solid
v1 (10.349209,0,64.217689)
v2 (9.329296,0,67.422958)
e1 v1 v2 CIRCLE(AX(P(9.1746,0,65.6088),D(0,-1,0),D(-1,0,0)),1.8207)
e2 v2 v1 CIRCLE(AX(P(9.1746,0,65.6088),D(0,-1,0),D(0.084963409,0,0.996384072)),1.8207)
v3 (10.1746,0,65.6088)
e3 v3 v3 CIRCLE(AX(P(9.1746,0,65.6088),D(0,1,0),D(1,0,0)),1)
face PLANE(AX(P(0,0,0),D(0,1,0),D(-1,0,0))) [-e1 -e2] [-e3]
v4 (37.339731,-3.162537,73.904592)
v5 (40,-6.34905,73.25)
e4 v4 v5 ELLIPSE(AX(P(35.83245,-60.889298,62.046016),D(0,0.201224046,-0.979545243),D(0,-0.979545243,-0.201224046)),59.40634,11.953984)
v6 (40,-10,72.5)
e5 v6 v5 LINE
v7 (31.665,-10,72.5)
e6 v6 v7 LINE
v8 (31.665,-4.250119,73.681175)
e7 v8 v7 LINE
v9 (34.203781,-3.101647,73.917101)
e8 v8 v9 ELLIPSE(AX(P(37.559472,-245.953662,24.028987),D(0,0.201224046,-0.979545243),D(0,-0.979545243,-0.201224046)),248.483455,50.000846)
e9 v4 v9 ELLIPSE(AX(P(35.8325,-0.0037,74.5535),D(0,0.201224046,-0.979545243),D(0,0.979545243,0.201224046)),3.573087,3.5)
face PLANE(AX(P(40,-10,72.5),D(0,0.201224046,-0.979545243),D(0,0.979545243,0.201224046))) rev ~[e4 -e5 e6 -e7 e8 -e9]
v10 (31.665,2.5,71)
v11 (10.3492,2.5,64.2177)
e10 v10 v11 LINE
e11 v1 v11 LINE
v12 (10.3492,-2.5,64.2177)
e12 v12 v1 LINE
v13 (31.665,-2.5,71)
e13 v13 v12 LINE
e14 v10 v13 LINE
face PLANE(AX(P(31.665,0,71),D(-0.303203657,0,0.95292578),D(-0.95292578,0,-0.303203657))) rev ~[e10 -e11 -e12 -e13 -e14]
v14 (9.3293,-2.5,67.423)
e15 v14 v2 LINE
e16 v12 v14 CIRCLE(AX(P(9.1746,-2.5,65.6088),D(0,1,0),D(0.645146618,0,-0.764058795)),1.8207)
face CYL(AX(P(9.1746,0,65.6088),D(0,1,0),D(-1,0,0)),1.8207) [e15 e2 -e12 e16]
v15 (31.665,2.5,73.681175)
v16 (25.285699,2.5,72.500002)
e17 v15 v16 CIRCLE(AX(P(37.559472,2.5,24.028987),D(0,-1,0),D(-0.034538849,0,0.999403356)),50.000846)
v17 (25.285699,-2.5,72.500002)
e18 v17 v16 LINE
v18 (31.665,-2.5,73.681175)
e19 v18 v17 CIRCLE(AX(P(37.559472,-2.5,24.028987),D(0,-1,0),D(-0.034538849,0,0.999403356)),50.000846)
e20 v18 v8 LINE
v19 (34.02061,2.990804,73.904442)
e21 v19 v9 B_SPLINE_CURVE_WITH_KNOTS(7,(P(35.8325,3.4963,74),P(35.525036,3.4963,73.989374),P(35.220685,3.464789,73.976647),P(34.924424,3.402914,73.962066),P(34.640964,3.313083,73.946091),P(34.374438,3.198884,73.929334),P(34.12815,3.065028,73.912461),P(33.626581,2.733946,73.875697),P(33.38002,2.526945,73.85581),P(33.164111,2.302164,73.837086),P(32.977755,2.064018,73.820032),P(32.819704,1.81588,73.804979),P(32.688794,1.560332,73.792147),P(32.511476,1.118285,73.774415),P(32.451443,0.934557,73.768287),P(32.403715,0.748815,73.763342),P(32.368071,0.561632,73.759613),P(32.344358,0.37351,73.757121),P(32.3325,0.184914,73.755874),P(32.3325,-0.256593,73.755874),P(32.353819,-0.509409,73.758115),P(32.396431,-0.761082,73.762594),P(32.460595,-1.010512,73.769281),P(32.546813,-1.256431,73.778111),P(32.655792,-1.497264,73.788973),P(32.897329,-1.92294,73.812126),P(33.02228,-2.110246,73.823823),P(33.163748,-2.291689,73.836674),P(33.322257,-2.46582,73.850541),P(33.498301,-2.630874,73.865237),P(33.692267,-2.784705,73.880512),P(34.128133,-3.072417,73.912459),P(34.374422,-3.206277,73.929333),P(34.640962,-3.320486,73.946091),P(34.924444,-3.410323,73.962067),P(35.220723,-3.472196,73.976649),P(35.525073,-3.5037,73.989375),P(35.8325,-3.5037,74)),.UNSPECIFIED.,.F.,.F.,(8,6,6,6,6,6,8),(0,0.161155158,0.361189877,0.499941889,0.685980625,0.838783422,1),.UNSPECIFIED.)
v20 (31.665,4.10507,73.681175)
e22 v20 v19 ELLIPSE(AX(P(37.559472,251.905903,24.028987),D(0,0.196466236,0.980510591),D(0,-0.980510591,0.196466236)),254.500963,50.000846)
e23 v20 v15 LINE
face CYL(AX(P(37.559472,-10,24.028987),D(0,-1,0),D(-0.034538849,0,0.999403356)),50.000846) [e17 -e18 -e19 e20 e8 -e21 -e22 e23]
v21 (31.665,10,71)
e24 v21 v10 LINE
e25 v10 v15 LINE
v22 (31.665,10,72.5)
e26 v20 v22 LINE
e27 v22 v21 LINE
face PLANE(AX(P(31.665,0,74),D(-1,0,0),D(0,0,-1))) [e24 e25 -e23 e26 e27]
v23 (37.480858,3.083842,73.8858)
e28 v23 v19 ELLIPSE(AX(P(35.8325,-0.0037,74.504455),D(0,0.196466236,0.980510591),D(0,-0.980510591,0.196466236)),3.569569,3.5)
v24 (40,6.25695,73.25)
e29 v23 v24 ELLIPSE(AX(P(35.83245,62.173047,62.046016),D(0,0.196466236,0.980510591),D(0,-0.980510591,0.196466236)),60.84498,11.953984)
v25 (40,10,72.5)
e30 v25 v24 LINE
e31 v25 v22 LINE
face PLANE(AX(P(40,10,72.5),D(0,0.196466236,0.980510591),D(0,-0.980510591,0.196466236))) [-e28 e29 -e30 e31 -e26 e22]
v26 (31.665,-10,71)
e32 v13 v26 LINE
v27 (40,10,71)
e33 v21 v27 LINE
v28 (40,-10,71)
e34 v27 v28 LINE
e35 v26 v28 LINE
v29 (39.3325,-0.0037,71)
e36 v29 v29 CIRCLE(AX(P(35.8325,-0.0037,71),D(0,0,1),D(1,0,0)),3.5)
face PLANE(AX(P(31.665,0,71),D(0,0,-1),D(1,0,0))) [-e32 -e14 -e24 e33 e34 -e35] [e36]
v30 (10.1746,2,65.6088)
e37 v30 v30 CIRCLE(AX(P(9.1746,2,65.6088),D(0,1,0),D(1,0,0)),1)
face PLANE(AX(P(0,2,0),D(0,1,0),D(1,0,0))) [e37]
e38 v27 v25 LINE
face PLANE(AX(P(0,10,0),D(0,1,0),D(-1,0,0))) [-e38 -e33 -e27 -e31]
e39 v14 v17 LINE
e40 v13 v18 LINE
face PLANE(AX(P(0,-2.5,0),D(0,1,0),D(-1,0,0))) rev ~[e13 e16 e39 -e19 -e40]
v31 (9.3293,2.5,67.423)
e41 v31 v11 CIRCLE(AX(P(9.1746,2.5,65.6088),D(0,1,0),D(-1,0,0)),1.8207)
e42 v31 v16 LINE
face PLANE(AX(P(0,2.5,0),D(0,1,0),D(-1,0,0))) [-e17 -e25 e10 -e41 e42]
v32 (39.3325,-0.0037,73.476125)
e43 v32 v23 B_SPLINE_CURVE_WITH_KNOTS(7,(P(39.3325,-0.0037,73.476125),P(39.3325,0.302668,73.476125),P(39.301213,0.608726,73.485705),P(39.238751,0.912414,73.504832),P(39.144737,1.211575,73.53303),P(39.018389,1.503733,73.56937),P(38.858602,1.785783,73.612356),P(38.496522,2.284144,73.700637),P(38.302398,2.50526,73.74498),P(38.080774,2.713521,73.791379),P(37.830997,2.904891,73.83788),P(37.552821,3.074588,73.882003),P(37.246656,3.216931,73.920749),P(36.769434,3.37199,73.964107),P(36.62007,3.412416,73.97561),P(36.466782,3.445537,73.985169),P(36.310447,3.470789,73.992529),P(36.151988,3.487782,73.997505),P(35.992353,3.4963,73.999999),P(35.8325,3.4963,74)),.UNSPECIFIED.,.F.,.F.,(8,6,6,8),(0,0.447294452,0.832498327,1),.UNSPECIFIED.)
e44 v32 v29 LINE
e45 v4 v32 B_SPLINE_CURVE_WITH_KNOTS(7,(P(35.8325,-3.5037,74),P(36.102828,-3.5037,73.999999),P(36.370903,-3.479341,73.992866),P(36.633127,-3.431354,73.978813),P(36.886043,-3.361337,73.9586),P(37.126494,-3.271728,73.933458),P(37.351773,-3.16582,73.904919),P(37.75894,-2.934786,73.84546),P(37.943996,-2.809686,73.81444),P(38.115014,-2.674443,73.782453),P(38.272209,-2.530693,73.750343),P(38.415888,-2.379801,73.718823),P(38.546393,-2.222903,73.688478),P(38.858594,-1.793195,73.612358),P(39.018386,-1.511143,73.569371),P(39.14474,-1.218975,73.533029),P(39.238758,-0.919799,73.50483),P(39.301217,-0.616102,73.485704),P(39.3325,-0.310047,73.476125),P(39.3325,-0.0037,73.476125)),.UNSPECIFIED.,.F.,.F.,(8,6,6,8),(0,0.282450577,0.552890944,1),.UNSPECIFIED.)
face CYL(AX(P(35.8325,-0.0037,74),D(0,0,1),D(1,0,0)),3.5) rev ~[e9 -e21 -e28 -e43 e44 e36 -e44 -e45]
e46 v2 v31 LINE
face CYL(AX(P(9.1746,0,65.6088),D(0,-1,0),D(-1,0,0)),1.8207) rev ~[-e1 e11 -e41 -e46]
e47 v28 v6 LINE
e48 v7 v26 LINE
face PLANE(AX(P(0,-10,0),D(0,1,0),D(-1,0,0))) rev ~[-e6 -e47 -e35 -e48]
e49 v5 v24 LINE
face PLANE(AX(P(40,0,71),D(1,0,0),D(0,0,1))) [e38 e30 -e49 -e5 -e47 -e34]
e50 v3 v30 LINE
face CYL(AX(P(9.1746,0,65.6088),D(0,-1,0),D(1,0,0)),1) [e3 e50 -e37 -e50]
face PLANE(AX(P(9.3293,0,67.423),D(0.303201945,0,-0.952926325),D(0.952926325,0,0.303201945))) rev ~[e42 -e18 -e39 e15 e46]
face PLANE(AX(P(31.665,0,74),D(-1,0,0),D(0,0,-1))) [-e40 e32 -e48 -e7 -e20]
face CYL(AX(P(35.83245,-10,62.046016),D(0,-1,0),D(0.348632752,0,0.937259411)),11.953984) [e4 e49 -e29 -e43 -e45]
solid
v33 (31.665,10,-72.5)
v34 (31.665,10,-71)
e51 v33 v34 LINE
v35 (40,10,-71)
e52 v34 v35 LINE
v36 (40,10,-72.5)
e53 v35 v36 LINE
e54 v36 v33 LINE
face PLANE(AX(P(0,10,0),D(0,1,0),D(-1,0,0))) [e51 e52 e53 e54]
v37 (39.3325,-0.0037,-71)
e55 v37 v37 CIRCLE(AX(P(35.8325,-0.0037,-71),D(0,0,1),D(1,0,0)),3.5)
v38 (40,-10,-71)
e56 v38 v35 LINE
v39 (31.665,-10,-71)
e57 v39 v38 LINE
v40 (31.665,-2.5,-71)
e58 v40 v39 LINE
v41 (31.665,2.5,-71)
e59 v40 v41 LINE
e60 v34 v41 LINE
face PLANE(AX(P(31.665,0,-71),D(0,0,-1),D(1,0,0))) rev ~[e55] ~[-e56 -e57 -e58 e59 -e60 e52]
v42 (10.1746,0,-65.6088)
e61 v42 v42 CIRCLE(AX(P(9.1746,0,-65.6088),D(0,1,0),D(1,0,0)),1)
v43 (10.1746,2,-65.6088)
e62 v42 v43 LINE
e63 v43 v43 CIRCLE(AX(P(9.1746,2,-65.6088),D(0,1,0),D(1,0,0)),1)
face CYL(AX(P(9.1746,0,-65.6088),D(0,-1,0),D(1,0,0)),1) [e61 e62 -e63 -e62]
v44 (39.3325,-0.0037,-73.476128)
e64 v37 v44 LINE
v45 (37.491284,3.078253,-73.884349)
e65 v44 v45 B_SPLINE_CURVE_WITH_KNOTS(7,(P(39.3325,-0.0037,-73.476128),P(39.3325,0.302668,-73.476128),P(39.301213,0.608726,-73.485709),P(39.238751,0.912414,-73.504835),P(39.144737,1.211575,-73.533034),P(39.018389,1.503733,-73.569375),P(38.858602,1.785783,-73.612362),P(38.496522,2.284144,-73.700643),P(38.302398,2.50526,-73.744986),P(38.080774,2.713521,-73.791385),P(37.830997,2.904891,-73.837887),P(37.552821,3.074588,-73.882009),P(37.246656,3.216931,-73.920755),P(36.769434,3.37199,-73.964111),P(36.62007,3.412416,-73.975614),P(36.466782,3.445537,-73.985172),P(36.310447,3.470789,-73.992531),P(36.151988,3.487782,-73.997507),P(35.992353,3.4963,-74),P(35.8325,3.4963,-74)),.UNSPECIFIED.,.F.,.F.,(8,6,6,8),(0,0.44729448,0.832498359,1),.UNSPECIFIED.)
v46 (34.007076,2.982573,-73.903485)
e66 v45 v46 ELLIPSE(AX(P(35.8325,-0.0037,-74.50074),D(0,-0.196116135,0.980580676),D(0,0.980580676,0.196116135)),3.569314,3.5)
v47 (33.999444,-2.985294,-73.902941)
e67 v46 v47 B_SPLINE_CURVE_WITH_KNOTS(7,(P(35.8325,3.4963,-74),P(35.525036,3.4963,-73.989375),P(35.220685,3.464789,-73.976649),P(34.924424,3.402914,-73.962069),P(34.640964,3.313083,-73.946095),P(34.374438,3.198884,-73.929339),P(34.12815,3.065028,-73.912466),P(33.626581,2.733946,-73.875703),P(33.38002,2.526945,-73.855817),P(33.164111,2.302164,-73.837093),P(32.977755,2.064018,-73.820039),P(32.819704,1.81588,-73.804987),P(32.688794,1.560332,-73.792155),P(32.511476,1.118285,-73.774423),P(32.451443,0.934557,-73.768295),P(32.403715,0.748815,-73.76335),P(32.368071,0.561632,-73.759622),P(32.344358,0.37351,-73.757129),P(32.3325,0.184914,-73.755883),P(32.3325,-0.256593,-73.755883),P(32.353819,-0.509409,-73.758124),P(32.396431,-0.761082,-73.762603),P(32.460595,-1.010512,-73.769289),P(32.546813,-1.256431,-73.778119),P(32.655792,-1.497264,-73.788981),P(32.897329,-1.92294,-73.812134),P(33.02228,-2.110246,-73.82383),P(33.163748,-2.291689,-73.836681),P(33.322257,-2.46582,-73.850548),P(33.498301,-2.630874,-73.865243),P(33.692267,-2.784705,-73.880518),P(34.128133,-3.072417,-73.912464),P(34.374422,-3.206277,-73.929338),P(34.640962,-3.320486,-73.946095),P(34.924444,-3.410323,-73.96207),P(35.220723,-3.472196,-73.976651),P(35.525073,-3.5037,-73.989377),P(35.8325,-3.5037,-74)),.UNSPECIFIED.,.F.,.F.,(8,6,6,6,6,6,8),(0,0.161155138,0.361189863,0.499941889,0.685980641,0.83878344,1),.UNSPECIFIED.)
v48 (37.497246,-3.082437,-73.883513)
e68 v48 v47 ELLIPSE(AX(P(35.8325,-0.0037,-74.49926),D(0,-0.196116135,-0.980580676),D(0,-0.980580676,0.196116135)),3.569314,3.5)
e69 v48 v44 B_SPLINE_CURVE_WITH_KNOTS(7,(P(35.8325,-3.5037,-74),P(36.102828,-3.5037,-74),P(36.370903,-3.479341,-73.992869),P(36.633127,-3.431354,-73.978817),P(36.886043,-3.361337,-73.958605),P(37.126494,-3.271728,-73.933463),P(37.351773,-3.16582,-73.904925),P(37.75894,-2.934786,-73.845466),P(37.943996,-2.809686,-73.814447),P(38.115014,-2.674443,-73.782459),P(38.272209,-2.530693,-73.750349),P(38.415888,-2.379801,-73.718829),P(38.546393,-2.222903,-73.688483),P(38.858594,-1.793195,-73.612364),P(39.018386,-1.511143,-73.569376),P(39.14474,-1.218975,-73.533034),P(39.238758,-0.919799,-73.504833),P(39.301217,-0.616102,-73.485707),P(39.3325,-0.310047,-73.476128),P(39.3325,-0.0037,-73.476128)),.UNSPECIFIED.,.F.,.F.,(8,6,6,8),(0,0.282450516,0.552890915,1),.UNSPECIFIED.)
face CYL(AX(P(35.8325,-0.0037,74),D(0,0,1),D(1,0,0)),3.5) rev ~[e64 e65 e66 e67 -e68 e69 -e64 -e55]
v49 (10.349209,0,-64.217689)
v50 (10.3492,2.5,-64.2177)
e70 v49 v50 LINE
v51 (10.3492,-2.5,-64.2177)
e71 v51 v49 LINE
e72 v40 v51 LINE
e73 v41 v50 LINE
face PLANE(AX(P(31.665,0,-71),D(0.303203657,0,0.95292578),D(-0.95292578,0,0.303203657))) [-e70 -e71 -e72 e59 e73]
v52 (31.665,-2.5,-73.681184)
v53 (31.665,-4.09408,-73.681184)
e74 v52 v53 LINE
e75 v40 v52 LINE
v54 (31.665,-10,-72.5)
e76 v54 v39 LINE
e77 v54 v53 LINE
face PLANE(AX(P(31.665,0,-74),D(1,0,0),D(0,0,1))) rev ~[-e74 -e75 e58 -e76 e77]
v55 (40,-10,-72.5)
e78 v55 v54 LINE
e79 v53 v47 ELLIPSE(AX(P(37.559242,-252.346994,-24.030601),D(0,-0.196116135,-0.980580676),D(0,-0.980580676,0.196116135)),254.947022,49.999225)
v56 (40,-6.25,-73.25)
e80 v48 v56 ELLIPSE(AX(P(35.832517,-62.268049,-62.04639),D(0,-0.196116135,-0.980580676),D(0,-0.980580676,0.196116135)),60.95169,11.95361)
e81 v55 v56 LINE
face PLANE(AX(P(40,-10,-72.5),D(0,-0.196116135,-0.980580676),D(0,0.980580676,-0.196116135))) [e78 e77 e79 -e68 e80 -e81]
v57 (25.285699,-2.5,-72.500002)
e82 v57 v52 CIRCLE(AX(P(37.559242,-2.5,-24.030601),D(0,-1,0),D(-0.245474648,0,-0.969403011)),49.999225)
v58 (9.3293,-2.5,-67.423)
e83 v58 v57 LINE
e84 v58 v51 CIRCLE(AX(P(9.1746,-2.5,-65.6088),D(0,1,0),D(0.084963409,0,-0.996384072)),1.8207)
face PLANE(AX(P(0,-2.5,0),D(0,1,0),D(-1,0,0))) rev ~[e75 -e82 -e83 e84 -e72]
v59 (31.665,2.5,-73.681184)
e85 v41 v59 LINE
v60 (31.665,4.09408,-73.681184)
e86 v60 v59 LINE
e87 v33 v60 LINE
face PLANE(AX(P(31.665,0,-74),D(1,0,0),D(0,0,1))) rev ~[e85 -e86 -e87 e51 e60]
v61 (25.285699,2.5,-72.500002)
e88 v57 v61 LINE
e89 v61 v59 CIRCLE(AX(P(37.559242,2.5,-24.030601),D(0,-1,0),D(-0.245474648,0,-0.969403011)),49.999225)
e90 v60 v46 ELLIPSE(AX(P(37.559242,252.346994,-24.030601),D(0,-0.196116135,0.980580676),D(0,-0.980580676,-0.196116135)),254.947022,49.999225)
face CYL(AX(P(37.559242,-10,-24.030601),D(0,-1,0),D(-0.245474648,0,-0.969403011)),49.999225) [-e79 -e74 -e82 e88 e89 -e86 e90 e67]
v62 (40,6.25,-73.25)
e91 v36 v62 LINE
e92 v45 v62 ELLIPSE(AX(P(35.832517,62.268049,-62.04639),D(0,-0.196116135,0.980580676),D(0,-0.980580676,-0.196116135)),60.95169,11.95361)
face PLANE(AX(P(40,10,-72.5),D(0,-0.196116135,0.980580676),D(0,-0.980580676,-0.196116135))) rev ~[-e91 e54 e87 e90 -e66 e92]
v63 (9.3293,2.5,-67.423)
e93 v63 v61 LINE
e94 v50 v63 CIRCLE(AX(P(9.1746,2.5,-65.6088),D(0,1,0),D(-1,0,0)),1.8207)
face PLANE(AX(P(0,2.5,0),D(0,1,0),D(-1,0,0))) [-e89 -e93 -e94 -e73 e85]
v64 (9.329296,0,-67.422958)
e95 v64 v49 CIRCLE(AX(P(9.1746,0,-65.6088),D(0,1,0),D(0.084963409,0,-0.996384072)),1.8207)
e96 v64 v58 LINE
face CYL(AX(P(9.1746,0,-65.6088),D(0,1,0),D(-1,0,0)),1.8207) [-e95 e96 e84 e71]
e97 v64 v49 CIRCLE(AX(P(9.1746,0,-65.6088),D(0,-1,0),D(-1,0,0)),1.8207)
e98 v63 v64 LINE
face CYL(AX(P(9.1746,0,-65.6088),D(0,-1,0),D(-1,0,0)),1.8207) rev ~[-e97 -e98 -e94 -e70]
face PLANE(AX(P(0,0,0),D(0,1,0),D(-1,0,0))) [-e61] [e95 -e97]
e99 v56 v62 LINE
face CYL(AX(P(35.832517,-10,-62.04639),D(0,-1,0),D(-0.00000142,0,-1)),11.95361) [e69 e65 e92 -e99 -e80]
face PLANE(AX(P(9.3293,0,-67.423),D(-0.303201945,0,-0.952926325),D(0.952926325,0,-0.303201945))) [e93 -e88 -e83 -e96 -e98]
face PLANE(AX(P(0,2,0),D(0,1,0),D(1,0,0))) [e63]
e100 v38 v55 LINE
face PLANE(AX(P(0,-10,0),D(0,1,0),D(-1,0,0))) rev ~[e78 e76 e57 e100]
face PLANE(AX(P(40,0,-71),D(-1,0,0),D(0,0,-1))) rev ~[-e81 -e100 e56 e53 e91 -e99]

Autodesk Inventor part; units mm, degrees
ref_plane "YZ Plane" through (0, 0, 0) normal (1, 0, 0) x (0, 1, 0)
ref_plane "XZ Plane" through (0, 0, 0) normal (0, 1, 0) x (-1, 0, 0)
ref_plane "XY Plane" through (0, 0, 0) normal (0, 0, 1) x (1, 0, 0)
sketch "Skizze1" plane through (0, 0, 0) normal (0, 0, 1) x (1, 0, 0)
  point P0 (0, 0)
sketch "Skizze2" plane through (0, 0, 0) normal (0, 1, 0) x (-1, 0, 0)
  line L0 (2.5, 30.2385) -> (-2.5, 30.2385)
  line L1 (-2.5, 30.2385) -> (-2.5, -30.2385)
  line L2 (-2.5, -30.2385) -> (2.5, -30.2385)
  line L3 (2.5, -30.2385) -> (2.5, 30.2385)
  line L4 (-2.5, 49) -> (-2.5, -49)
  line L5 (2.5, -49) -> (2.5, 49)
  circle A0 centre (0, 49) radius 2.5
  circle A1 centre (0, -49) radius 2.5
  line L6 (-9.3293, 67.423) -> (-30, 74)
  line L7 (-7.3602, 65.7604) -> (0, 51.5)
  line L8 (-31.665, 71) -> (-10.3492, 64.2177)
  line L9 (-10.3492, 64.2177) -> (-2.4949, 49)
  line L10 (-31.665, 71) -> (-40, 71)
  line L11 (-30, 74) -> (-40, 74)
  line L12 (-10.3492, 64.2177) -> (-8, 67)
  circle A2 centre (-9.1746, 65.6088) radius 1.8207
  line L13 (-40, 71) -> (-40, 74)
  circle A3 centre (-9.1746, 65.6088) radius 0.9616
  line L14 (-7.3602, -65.7604) -> (0, -51.5)
  circle A4 centre (-9.1746, -65.6088) radius 0.9616
  circle A5 centre (-9.1746, -65.6088) radius 1.8207
  line L15 (-10.3492, -64.2177) -> (-2.4949, -49)
  line L16 (-31.665, -71) -> (-10.3492, -64.2177)
  line L17 (-9.3293, -67.423) -> (-30, -74)
  line L18 (-30, -74) -> (-40, -74)
  line L19 (-40, -71) -> (-40, -74)
  line L20 (-31.665, -71) -> (-40, -71)
  point P0 (0, 0)
  point P1 (0, 0)
  point P2 (0, -30.2385)
  point P3 (2.5, 0)
  point P4 (2.5, 0)
  point P5 (-48.2893, 0)
  dimension "d0" = 5
extrude "Extrusion1" add sketch "Skizze2" along normal mid plane 5 contours L8 L10 L13 L11 L6 A2 | A5 L17 L18 L19 L20 L16
extrude "Extrusion2" add sketch "Skizze2" against normal blind 2.5 contours A2 L12 A3 | A2 L12 A3 | A5 | A3 L12 | L12 A3 | A4
ref_plane "Arbeitsebene1" through (10.3492, 2.5, -64.2177) normal (0, 1, 0) x (1, 0, 0)
sketch "Skizze3" plane through (0, 0, 0) normal (0, 1, 0) x (-1, 0, 0)
  line L0 (-30, 74) -> (-40, 74) projected
  line L1 (-31.665, 71) -> (-10.3492, 64.2177) projected
  line L2 (-40, 74) -> (-31.665, 74)
  line L3 (-31.665, 74) -> (-31.665, 71)
  line L4 (-31.665, 71) -> (-40, 71)
  line L5 (-40, 71) -> (-40, 74)
  line L6 (-40, -71) -> (-40, -74) projected
  line L7 (-31.665, -71) -> (-40, -71) projected
  line L8 (-40, -74) -> (-31.665, -74)
  line L9 (-31.665, -74) -> (-31.665, -71)
  line L10 (-31.665, -71) -> (-40, -71)
  line L11 (-40, -71) -> (-40, -74)
  point P0 (0, 0)
extrude "Extrusion3" add sketch "Skizze3" along normal mid plane 20
sketch "Skizze4" plane through (30, -2.5, 74) normal (0, 0, 1) x (1, 0, 0)
  circle A0 centre (5.8325, 2.4963) radius 3.5
  point P0 (-30, 2.5)
  point P1 (1.665, 5)
  dimension "d27" = 7
extrude "Extrusion4" cut sketch "Skizze4" against normal blind 150
sketch "Skizze5" plane through (40, -10, 71) normal (1, 0, 0) x (0, 0, -1)
  line L0 (0, 0) -> (0, 7.5) projected
  line L1 (-3, 0) -> (-3, 20) projected
  line L2 (-1.5, 0) -> (-3, 0)
  line L3 (-3, 0) -> (-3, 7.3019)
  line L4 (-3, 12.5) -> (-3, 20) projected
  line L5 (0, 0) -> (0, 20) projected
  line L6 (-3, 20) -> (-1.5, 20)
  line L7 (0, 12.5139) -> (-3, 12.5139)
  line L8 (-3, 12.5139) -> (-3, 20)
  line L9 (0, 20) -> (-3, 20) projected
  line L10 (-1.5, 20) -> (-3, 12.5139)
  line L11 (-3, 0) -> (0, 0) projected
  line L12 (-1.5, 0) -> (-3, 7.3019)
  point P0 (71, 10)
extrude "Extrusion5" cut sketch "Skizze5" against normal blind 10 contours L2 L1 L12 | L1 L6 L10
sketch "Skizze6" plane through (40, -10, -74) normal (1, 0, 0) x (0, 0, -1)
  line L0 (-3, 7.5) -> (-3, 0) projected
  line L1 (-3, 0) -> (0, 0) projected
  line L2 (0, 7.5) -> (0, 0)
  line L3 (0, 0) -> (-1.5, 0)
  line L4 (-3, 12.5) -> (0, 12.5) projected
  line L5 (0, 12.5) -> (0, 20) projected
  line L6 (0, 12.5) -> (0, 20)
  line L7 (0, 20) -> (-1.5, 20)
  line L8 (0, 20) -> (-3, 20) projected
  line L9 (-1.5, 20) -> (0, 12.5)
  line L10 (0, 0) -> (0, 7.5) projected
  line L11 (-1.5, 0) -> (0, 7.5)
  point P0 (-74, 10)
extrude "Extrusion6" cut sketch "Skizze6" against normal blind 10
sketch "Skizze7" plane through (40, -10, -71) normal (1, 0, 0) x (0, 0, -1)
  point P0 (-71, 10)
sketch "Skizze8" plane through (0, -10, 0) normal (0, -1, 0) x (1, 0, 0)
  line L0 (9.3293, -67.423) -> (30, -74) projected
  line L1 (40, -71) -> (40, -72.5) projected
  line L2 (31.665, -74) -> (40, -74) projected
  line L3 (35.8325, -74) -> (40, -74)
  line L4 (40, -74) -> (40, -73.25)
  line L5 (40, -74) -> (40, -72.5) projected
  arc A0 (35.8325, -74) -> (40, -73.25) centre (35.8325, -62.0462) ccw
  line L6 (39.3325, -74) -> (32.3325, -74) projected
  line L7 (40, -72.5) -> (31.665, -72.5) projected
  line L8 (41.6903, 0) -> (29.392, 0)
  line L9 (31.665, 74) -> (40, 74)
  line L10 (40, 74) -> (40, 73.25)
  arc A1 (40, 73.25) -> (35.8325, 74) centre (35.8325, 62.0462) ccw
  point P0 (0, 0)
  point P1 (35.8325, 74)
extrude "Extrusion7" cut sketch "Skizze8" against normal blind 20
sketch "Skizze9" plane through (0, -10, 0) normal (0, -1, 0) x (1, 0, 0)
  line L0 (31.665, 74) -> (33.5986, 74) projected
  line L1 (40, 72.5) -> (31.665, 72.5) projected
  line L2 (31.665, 74) -> (30, 74) projected
  line L3 (30, 74) -> (35.8325, 74)
  line L4 (9.3293, 67.423) -> (30, 74) projected
  line L5 (30, 74) -> (25.2857, 74)
  line L6 (25.2857, 74) -> (25.2857, 72.5)
  arc A0 (35.8325, 74) -> (25.2857, 72.5) centre (37.5594, 24.0298) ccw
  line L7 (42.1638, 0) -> (18.6987, 0) construction
  line L8 (31.665, -74) -> (35.8325, -74)
  line L9 (31.665, -74) -> (30, -74)
  line L10 (30, -74) -> (25.2857, -74)
  line L11 (25.2857, -74) -> (25.2857, -72.5)
  arc A1 (25.2857, -72.5) -> (35.8325, -74) centre (37.5594, -24.0298) ccw
  point P0 (0, 0)
  point P1 (35.8325, 74)
  point P2 (35.8325, -74)
  point P3 (35.8325, 74)
extrude "Extrusion8" cut sketch "Skizze9" against normal blind 20
sketch "Skizze10" plane through (0, 0, 0) normal (0, 1, 0) x (1, 0, 0)
  arc A0 (9.3293, 67.423) -> (10.3492, 64.2177) centre (9.1746, 65.6088) ccw projected
  circle A1 centre (9.1746, 65.6088) radius 1
  line L0 (3.0459, 0) -> (11.7112, 0) construction
  circle A2 centre (9.1746, -65.6088) radius 1
  point P0 (0, 0)
  dimension "d21" = 2
extrude "Extrusion10" add sketch "Skizze10" along normal blind 2
ref_plane "Arbeitsebene3" through (40.9441, -2.0037, 73.9117) normal (0.0345377, 0, 0.9994034) x (0, 1, 0)
ref_plane "Arbeitsebene2" through (35.8325, -2.0037, -74) normal (0.0345377, 0, 0.9994034) x (0, 1, 0)
